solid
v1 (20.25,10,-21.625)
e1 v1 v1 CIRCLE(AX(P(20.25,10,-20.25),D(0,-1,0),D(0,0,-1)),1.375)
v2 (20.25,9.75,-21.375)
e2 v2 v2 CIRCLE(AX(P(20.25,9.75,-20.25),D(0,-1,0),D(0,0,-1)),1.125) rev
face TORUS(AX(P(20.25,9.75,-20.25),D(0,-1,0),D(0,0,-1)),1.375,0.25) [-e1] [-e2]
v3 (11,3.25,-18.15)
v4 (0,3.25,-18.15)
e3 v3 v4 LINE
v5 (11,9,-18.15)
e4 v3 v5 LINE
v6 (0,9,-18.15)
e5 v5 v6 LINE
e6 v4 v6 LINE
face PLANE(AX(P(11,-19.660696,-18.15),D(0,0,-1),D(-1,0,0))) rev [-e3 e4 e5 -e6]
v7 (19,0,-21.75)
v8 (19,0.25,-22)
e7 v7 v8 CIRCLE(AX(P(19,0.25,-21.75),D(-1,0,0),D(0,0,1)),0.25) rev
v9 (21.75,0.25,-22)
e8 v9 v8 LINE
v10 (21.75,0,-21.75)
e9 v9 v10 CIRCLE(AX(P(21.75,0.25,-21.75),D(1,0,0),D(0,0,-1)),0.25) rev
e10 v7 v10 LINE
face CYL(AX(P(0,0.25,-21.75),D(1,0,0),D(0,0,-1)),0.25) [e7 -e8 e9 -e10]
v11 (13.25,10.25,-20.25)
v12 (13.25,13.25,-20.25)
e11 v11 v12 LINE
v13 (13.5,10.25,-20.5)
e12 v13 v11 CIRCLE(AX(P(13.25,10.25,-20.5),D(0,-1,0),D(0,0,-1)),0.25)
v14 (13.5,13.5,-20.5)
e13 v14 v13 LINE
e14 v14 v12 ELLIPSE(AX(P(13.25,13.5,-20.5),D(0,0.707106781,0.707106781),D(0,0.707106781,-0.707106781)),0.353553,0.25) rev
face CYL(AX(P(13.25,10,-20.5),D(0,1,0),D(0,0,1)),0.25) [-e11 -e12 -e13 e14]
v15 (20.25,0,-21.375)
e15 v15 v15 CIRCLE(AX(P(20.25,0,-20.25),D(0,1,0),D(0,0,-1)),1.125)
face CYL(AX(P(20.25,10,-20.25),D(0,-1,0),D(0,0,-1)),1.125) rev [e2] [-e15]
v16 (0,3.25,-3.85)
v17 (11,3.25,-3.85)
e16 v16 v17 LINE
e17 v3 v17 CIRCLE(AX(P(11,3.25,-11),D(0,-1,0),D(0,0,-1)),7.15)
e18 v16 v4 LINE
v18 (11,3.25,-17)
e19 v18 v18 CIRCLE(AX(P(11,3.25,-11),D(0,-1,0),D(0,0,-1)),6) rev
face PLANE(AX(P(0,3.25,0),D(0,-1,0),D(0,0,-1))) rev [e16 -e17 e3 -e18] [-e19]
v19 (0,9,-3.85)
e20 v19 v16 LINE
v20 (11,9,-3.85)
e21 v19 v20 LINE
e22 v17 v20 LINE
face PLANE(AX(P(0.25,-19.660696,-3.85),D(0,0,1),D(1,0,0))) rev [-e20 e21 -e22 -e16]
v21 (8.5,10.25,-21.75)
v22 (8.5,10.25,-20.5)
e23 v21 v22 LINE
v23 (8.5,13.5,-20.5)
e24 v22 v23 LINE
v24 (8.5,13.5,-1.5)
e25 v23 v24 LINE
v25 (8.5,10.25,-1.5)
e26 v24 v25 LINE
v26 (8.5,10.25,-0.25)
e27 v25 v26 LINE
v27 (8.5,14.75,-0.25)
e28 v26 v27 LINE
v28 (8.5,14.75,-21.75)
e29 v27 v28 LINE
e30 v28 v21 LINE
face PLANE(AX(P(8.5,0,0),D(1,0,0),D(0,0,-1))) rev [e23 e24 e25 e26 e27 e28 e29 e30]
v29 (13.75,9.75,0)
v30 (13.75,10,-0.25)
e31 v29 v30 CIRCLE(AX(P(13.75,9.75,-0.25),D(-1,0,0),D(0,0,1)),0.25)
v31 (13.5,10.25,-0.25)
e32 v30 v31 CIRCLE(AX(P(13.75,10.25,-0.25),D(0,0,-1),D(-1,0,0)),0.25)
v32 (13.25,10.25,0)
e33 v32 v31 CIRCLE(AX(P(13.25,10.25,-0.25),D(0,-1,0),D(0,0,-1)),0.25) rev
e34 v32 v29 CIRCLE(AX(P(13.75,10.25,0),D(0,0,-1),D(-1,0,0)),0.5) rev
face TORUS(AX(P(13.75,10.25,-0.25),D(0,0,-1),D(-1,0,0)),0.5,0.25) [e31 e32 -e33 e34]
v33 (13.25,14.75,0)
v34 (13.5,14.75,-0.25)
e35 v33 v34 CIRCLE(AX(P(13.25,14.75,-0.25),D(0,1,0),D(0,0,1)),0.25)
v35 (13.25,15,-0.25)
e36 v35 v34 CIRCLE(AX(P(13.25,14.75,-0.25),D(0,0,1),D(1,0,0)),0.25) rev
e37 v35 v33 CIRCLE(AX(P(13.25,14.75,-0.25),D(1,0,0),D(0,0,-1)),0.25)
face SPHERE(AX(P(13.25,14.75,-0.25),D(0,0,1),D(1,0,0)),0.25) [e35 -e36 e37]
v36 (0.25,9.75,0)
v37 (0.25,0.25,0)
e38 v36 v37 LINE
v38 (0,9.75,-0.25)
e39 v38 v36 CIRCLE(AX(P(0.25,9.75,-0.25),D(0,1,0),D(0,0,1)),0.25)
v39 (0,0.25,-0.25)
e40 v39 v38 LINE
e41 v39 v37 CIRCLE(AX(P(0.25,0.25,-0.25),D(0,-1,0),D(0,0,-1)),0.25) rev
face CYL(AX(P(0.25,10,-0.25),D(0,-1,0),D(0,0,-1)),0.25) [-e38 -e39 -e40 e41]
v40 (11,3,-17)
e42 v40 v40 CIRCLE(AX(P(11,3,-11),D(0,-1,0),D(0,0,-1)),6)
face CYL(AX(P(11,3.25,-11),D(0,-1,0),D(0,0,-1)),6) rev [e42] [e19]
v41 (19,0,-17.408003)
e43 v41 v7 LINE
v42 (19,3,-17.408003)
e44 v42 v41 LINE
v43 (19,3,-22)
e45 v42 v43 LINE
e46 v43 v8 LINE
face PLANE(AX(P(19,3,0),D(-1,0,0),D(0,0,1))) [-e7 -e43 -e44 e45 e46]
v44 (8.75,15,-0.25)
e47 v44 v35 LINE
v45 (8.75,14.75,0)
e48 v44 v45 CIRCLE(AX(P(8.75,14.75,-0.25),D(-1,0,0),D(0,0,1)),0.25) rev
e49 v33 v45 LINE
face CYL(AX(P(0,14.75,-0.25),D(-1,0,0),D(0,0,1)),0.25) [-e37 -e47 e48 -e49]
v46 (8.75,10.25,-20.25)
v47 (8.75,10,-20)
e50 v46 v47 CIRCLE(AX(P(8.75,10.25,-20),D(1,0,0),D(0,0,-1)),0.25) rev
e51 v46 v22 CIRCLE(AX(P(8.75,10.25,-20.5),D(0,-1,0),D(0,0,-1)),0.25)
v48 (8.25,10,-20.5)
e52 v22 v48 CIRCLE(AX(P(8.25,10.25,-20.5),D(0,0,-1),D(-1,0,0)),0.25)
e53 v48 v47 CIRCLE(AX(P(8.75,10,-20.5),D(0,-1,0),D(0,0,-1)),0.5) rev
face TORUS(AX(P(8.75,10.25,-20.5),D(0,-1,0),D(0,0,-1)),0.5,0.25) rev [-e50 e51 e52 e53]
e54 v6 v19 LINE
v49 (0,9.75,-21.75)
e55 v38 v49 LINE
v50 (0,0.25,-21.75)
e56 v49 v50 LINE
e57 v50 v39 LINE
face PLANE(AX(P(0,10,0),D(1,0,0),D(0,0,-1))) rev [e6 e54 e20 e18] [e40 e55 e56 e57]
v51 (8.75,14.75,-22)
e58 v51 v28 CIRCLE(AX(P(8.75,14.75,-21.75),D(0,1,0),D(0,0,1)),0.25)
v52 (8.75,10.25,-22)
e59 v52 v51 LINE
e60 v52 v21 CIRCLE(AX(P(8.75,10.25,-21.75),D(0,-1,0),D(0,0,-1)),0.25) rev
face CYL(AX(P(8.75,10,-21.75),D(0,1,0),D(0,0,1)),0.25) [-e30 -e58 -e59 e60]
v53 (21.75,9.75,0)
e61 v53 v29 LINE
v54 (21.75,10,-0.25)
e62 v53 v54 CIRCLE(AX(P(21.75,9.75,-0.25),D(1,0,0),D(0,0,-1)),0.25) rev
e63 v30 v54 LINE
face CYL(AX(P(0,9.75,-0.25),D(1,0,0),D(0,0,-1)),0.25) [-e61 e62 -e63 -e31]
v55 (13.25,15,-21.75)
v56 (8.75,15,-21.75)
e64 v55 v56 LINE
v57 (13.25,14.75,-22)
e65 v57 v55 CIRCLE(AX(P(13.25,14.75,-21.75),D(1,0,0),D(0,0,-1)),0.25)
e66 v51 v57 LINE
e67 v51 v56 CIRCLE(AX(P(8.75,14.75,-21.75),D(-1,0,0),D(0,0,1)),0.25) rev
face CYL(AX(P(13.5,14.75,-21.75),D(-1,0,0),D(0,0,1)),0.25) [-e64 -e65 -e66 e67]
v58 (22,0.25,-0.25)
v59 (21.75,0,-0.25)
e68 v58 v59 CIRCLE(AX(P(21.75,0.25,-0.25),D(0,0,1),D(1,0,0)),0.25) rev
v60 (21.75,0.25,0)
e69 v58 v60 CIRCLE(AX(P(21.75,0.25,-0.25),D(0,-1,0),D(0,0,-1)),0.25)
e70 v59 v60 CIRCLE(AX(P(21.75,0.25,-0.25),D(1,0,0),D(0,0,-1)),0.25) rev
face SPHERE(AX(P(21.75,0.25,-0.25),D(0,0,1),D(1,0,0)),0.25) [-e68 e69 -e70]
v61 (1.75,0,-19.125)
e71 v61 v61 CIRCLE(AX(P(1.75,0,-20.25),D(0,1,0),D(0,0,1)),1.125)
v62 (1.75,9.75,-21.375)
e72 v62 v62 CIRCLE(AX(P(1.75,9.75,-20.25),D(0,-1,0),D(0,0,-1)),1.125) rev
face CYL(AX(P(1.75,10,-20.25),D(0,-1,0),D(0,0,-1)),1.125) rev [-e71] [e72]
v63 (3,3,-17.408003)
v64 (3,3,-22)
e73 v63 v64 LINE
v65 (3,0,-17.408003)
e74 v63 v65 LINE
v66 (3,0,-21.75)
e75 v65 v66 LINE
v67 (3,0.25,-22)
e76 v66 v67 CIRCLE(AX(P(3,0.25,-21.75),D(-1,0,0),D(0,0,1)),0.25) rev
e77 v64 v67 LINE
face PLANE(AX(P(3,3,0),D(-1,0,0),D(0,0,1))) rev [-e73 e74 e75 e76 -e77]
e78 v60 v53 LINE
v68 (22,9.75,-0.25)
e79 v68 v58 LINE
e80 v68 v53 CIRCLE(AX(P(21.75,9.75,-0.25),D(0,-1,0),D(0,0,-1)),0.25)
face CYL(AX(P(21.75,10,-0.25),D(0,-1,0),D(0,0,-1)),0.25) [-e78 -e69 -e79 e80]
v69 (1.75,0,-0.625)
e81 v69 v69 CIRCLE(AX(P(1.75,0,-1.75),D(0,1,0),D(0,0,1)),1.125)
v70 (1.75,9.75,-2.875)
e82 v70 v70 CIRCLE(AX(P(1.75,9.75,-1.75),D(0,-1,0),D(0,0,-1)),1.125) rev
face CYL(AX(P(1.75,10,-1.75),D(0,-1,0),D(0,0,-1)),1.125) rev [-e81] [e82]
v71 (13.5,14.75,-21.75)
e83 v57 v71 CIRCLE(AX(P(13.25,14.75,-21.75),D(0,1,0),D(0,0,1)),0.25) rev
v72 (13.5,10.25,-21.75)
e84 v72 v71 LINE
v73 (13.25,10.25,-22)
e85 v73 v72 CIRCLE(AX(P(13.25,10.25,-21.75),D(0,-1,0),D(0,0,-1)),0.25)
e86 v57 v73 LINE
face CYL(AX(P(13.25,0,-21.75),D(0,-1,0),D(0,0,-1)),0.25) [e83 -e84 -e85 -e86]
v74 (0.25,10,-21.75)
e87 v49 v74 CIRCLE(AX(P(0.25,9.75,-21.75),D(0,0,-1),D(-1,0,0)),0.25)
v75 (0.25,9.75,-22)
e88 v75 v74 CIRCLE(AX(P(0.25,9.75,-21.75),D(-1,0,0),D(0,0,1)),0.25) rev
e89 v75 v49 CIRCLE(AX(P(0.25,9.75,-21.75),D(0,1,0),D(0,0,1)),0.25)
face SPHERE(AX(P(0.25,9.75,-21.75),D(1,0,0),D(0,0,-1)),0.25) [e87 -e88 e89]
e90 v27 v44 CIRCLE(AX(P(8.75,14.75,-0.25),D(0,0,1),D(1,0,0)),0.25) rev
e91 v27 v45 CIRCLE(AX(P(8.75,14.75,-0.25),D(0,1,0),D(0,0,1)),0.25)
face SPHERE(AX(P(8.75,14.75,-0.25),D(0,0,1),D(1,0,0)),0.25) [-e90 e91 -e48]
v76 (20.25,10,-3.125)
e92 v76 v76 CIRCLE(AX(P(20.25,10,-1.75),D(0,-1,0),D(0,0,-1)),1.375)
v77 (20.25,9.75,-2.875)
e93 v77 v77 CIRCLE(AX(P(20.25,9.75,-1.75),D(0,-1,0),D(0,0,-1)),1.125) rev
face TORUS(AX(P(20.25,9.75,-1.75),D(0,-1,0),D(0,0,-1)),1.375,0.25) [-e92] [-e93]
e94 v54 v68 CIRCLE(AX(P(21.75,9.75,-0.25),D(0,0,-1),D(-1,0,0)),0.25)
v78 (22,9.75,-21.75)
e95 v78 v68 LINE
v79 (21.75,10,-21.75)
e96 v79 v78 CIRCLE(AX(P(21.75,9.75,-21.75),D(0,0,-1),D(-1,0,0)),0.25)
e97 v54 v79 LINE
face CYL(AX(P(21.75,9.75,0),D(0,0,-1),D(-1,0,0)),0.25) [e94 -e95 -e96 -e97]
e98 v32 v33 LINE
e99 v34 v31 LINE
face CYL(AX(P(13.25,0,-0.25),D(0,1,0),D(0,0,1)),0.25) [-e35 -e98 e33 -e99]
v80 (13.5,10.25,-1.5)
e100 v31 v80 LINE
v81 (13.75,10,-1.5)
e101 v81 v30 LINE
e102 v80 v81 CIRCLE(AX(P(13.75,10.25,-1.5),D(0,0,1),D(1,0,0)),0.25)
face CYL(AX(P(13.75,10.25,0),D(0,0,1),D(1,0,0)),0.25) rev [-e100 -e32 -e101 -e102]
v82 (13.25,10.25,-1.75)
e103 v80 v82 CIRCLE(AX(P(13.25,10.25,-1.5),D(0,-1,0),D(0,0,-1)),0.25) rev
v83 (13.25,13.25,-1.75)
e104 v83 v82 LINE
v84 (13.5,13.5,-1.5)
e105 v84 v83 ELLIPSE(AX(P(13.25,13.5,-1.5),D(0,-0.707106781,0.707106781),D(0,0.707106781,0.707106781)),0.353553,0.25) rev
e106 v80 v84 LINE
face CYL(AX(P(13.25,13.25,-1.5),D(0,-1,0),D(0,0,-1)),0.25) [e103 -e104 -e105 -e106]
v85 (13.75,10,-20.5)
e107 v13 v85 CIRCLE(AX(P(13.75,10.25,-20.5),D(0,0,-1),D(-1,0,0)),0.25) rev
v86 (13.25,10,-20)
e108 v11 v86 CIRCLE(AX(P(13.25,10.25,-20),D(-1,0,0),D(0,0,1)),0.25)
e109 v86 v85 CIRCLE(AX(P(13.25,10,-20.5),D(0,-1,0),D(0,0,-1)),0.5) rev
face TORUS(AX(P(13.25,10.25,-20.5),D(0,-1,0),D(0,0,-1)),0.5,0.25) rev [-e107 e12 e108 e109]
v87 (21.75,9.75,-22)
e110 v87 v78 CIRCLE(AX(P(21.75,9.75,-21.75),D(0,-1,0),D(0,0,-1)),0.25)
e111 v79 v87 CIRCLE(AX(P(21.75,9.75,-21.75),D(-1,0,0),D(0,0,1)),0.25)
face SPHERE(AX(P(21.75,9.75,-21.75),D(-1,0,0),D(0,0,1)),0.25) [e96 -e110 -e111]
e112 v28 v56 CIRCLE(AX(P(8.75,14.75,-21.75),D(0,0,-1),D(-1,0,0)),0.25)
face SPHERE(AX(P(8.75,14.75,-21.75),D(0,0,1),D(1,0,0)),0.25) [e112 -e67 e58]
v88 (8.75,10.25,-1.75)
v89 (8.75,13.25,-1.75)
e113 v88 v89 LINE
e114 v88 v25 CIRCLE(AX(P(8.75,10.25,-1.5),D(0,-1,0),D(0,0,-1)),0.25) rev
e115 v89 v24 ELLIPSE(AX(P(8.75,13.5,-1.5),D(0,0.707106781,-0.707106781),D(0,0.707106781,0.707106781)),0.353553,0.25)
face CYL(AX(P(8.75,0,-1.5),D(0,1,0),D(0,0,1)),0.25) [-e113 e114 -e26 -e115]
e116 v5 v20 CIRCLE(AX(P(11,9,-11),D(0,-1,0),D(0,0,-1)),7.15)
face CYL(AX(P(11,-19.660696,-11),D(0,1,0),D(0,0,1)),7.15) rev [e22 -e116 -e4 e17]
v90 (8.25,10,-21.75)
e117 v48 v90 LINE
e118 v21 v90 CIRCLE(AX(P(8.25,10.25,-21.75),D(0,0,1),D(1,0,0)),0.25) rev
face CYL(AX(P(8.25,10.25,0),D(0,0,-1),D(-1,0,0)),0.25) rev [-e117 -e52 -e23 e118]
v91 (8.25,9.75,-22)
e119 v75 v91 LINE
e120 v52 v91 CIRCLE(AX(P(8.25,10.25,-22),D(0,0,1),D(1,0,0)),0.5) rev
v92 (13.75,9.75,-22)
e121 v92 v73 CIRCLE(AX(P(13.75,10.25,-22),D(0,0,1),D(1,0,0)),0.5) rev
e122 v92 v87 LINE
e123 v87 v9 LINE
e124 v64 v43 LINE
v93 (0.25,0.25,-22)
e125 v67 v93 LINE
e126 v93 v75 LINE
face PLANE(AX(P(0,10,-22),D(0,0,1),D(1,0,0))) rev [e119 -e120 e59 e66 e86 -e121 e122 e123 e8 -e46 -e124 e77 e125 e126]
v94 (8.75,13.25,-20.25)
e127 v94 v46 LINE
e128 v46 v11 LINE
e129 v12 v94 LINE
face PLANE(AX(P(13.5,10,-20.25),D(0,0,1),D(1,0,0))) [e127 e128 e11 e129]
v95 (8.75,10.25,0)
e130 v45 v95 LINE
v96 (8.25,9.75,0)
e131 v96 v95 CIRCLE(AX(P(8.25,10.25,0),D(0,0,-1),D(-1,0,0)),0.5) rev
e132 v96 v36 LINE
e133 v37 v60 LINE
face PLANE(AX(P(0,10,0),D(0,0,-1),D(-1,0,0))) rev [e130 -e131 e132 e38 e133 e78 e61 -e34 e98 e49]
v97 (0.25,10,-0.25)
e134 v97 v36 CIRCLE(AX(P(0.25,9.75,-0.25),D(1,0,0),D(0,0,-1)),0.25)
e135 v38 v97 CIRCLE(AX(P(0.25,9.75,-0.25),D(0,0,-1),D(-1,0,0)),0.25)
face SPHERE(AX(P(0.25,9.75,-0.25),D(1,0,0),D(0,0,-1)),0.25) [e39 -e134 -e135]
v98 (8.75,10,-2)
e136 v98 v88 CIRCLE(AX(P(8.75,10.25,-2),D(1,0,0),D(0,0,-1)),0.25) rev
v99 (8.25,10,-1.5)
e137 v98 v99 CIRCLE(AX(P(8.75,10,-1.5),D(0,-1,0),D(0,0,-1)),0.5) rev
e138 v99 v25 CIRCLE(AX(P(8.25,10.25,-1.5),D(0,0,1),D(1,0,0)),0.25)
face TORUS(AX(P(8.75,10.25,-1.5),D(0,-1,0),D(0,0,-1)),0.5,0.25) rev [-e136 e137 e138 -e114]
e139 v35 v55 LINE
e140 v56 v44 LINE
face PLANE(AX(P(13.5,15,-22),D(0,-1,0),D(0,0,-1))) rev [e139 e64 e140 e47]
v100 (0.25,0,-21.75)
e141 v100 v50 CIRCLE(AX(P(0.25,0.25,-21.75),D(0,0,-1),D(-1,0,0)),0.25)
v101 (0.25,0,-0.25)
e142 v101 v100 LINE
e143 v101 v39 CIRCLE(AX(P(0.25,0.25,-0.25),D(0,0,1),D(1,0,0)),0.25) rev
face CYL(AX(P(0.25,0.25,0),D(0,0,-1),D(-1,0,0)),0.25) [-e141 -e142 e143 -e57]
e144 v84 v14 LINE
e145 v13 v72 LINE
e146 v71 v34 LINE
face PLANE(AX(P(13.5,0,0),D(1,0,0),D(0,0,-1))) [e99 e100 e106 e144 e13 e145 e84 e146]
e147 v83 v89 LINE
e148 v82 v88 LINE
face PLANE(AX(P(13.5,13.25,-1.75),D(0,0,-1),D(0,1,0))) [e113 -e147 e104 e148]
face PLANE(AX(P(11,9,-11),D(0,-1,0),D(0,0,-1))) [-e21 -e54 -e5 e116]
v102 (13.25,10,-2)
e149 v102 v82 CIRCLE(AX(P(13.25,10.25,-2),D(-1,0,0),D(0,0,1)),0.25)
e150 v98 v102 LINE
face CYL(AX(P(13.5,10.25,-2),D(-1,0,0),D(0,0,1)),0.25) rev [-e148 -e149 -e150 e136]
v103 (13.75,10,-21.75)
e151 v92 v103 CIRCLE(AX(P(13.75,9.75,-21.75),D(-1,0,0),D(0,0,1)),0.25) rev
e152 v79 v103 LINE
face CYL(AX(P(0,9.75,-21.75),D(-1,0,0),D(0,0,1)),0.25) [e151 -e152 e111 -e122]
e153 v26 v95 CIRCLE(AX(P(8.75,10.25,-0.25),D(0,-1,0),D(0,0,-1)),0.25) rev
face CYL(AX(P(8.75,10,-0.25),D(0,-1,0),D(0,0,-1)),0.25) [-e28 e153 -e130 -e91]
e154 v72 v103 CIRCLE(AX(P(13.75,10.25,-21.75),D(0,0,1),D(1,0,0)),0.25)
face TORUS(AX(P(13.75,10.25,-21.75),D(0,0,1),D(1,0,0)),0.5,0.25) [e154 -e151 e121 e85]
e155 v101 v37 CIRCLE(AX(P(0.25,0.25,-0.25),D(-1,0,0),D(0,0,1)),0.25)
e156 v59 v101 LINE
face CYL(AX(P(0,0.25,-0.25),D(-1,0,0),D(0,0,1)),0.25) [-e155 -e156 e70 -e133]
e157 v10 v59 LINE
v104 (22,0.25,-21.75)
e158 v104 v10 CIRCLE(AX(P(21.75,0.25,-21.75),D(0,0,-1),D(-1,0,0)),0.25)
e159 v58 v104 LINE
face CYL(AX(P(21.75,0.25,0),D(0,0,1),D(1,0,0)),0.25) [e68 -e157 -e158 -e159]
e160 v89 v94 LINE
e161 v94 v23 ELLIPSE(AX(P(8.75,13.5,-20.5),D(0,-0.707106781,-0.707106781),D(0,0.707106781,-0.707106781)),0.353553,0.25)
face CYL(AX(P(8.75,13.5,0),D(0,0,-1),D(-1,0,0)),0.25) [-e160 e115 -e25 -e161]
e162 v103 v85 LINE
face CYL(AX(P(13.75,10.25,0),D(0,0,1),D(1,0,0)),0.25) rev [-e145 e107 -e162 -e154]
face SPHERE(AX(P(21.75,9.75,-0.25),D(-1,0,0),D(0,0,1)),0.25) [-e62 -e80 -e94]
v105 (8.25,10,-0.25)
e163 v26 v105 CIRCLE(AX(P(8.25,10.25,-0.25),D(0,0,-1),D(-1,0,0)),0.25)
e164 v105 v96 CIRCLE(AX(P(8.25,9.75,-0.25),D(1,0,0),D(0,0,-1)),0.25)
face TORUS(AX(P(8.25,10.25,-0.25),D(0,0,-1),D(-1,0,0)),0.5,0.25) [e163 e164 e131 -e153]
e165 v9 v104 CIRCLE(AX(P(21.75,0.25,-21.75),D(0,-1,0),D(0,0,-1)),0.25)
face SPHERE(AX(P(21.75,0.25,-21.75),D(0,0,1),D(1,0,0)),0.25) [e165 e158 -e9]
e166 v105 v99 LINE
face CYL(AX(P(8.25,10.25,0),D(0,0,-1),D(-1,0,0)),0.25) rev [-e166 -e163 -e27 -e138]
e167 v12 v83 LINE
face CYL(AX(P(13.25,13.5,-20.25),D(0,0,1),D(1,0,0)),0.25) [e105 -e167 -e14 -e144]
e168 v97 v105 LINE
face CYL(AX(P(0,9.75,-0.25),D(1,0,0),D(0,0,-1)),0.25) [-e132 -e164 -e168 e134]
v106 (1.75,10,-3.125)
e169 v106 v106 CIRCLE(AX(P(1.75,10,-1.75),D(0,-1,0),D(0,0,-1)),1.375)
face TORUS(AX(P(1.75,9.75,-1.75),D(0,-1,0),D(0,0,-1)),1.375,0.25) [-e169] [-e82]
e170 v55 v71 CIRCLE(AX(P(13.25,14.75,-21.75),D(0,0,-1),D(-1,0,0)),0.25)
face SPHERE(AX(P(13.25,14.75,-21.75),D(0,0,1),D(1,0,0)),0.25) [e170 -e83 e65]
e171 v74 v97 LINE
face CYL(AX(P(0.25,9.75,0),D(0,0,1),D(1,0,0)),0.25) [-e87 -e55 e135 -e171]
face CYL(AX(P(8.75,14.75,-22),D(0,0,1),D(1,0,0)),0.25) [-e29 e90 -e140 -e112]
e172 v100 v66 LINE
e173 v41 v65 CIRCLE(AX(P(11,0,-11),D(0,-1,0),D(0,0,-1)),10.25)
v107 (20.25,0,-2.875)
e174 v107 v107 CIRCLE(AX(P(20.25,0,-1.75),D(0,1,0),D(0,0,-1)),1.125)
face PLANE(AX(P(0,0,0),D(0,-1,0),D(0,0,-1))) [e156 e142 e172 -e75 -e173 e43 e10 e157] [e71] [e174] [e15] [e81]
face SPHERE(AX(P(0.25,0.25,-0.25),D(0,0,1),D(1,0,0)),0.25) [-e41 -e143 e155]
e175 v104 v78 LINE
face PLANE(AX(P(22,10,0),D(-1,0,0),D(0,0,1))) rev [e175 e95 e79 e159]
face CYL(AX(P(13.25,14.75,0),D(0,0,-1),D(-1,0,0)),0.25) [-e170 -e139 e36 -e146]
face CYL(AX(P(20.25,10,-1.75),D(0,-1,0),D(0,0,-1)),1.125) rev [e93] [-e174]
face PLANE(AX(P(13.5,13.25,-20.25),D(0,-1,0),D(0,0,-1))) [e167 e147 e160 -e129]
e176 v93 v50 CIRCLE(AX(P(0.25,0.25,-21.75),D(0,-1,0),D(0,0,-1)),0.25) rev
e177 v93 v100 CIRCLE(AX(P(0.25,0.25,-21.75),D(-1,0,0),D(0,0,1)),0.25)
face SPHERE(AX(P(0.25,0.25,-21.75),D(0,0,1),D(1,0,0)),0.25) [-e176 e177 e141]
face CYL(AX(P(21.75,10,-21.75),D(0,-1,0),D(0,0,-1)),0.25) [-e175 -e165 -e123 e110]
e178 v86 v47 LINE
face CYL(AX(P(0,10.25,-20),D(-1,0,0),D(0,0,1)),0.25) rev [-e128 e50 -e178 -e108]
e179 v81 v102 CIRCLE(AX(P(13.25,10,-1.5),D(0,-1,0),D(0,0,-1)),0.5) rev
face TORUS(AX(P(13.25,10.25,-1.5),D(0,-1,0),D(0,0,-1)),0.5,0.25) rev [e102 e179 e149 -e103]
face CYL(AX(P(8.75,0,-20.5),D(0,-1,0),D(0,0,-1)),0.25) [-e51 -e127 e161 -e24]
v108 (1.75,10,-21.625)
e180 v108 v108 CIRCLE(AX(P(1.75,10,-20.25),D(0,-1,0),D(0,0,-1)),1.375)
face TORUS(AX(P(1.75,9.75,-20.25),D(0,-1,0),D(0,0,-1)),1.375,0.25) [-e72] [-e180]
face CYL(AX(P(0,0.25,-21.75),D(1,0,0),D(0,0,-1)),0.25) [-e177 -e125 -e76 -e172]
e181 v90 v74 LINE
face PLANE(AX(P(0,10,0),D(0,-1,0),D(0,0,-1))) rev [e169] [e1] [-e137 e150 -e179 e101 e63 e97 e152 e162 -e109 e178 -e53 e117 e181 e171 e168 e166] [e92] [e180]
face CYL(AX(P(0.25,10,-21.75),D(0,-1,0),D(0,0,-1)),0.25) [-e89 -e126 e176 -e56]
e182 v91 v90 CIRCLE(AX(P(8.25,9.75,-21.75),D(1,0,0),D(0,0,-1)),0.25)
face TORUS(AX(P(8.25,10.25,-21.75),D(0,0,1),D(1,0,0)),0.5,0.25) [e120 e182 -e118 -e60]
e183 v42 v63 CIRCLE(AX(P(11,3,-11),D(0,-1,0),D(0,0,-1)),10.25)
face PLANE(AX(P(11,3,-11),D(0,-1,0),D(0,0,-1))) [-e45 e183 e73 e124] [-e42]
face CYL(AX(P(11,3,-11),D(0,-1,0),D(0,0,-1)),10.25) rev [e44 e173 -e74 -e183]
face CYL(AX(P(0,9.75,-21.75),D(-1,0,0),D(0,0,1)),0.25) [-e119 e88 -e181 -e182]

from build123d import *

# Parameters (mm, degrees)
SKETCH1_W                = 22
SKETCH1_H                = 22
SKETCH1_R                = 1.125
BOSS_EXTRUDE1_DEPTH      = 10
BOSS_EXTRUDE2_DEPTH      = 2.5
BOSS_EXTRUDE2_DEPTH_BACK = 2.5
FILLET1_R                = 0.25
FILLET2_R                = 0.25
SKETCH3_R                = 10.25
CUT_EXTRUDE1_DEPTH       = 3
SKETCH4_R                = 6
CUT_EXTRUDE2_DEPTH       = 0.25
CUT_EXTRUDE4_DEPTH       = 5.75
SKETCH6_W                = 14.3
SKETCH6_H                = 5.75
CUT_EXTRUDE5_DEPTH       = 10
CUT_EXTRUDE6_START       = -3
CUT_EXTRUDE6_DEPTH       = 3


# Read off the part's stored shape, not the designer's step: Cut-Extrude6
with BuildPart() as part:
    # Sketch1 → Boss-Extrude1 (new body)
    with BuildSketch(Plane(origin=(0, 0, 0), x_dir=(1, 0, 0), z_dir=(0, 1, 0))):
        with Locations((11, 11)):
            Rectangle(SKETCH1_W, SKETCH1_H)
        with Locations(Location((1.75, 20.25, 0), (0, 0, 270))):
            Circle(SKETCH1_R, mode=Mode.SUBTRACT)
        with Locations(Location((1.75, 1.75, 0), (0, 0, 270))):
            Circle(SKETCH1_R, mode=Mode.SUBTRACT)
        with Locations(Location((20.25, 1.75, 0), (0, 0, 90))):
            Circle(SKETCH1_R, mode=Mode.SUBTRACT)
        with Locations(Location((20.25, 20.25, 0), (0, 0, 90))):
            Circle(SKETCH1_R, mode=Mode.SUBTRACT)
    extrude(amount=BOSS_EXTRUDE1_DEPTH)

    # Sketch2 → Boss-Extrude2 (add, two sides: drawn at the far end of the back side and taken through both)
    with BuildSketch(Plane.ZY.offset(-11).offset(-BOSS_EXTRUDE2_DEPTH_BACK)):
        Polygon((-22, 10), (-22, 15), (0, 15), (0, 10), (-1.75, 10), (-1.75, 13.25), (-20.25, 13.25), (-20.25, 10), align=None)
    extrude(amount=BOSS_EXTRUDE2_DEPTH + BOSS_EXTRUDE2_DEPTH_BACK)

    # Fillet1
    fillet1_edges = [part.edges().sort_by_distance(p)[0] for p in [
        (17.75, 10, -22),
        (4.25, 10, -22),
        (17.75, 10, 0),
        (13.5, 11.625, -20.25),
        (11, 10, -20.25),
        (13.5, 10, -21.125),
        (8.5, 12.5, -22),
        (11, 15, -22),
        (8.5, 15, -11),
        (11, 15, 0),
        (8.5, 12.5, 0),
        (13.5, 10, -0.875),
        (11, 10, -1.75),
        (13.5, 11.625, -1.75),
        (13.5, 13.25, -11),
        (13.5, 12.5, -22),
        (13.5, 15, -11),
        (13.5, 12.5, 0),
        (8.5, 11.625, -20.25),
        (8.5, 13.25, -11),
        (8.5, 11.625, -1.75),
        (8.5, 10, -0.875),
        (8.5, 10, -21.125),
        (4.25, 10, 0),
    ]]
    fillet(fillet1_edges, radius=FILLET1_R)

    # Fillet2
    fillet2_edges = [part.edges().sort_by_distance(p)[0] for p in [
        (1.75, 10, -21.375),
        (1.75, 10, -2.875),
        (20.25, 10, -0.625),
        (20.25, 10, -19.125),
        (11, 0, -22),
        (22, 0, -11),
        (11, 0, 0),
        (0, 10, -11),
        (22, 10, -11),
        (0, 0, -11),
        (0, 4.875, -22),
        (22, 4.875, -22),
        (22, 4.875, 0),
        (22, 9.926776695, -0.073223305),
        (22, 9.926776695, -21.926776695),
        (0, 4.875, 0),
        (0, 9.926776695, -21.926776695),
        (0, 9.926776695, -0.073223305),
    ]]
    fillet(fillet2_edges, radius=FILLET2_R)

    # Sketch3 → Cut-Extrude1 (cut)
    with BuildSketch(Plane.XZ):
        with Locations(Location((11, -11, 0), (0, 0, 270))):
            Circle(SKETCH3_R)
    extrude(amount=-CUT_EXTRUDE1_DEPTH, mode=Mode.SUBTRACT)

    # Sketch4 → Cut-Extrude2 (cut)
    with BuildSketch(Plane.XZ.offset(-3)):
        with Locations(Location((11, -11, 0), (0, 0, 270))):
            Circle(SKETCH4_R)
    extrude(amount=-CUT_EXTRUDE2_DEPTH, mode=Mode.SUBTRACT)

    # Sketch5 → Cut-Extrude4 (cut)
    with BuildSketch(Plane(origin=(0, 9, 0), x_dir=(1, 0, 0), z_dir=(0, 1, 0))):
        with BuildLine():
            Line((11, 18.15), (0.25, 18.15))
            Line((0.25, 18.15), (0.25, 3.85))
            Line((0.25, 3.85), (11, 3.85))
            ThreePointArc((11, 3.85), (18.15, 11), (11, 18.15))
        make_face()
    extrude(amount=-CUT_EXTRUDE4_DEPTH, mode=Mode.SUBTRACT)

    # Sketch6 → Cut-Extrude5 (cut)
    with BuildSketch(Plane(origin=(0.25, 0, 0), x_dir=(0, 0, -1), z_dir=(1, 0, 0))):
        with Locations((11, 6.125)):
            Rectangle(SKETCH6_W, SKETCH6_H)
    extrude(amount=-CUT_EXTRUDE5_DEPTH, mode=Mode.SUBTRACT)

    # Cut-Extrude6 outline → Cut-Extrude6 (cut)
    with BuildSketch(Plane.XZ.offset(CUT_EXTRUDE6_START)):
        with BuildLine():
            Line((19, -22), (19, -17.408002809))
            ThreePointArc((19, -17.408002809), (11, -21.25), (3, -17.408002809))
            Line((3, -17.408002809), (3, -22))
            Line((3, -22), (19, -22))
        make_face()
    extrude(amount=CUT_EXTRUDE6_DEPTH, mode=Mode.SUBTRACT)


solid = part.part
